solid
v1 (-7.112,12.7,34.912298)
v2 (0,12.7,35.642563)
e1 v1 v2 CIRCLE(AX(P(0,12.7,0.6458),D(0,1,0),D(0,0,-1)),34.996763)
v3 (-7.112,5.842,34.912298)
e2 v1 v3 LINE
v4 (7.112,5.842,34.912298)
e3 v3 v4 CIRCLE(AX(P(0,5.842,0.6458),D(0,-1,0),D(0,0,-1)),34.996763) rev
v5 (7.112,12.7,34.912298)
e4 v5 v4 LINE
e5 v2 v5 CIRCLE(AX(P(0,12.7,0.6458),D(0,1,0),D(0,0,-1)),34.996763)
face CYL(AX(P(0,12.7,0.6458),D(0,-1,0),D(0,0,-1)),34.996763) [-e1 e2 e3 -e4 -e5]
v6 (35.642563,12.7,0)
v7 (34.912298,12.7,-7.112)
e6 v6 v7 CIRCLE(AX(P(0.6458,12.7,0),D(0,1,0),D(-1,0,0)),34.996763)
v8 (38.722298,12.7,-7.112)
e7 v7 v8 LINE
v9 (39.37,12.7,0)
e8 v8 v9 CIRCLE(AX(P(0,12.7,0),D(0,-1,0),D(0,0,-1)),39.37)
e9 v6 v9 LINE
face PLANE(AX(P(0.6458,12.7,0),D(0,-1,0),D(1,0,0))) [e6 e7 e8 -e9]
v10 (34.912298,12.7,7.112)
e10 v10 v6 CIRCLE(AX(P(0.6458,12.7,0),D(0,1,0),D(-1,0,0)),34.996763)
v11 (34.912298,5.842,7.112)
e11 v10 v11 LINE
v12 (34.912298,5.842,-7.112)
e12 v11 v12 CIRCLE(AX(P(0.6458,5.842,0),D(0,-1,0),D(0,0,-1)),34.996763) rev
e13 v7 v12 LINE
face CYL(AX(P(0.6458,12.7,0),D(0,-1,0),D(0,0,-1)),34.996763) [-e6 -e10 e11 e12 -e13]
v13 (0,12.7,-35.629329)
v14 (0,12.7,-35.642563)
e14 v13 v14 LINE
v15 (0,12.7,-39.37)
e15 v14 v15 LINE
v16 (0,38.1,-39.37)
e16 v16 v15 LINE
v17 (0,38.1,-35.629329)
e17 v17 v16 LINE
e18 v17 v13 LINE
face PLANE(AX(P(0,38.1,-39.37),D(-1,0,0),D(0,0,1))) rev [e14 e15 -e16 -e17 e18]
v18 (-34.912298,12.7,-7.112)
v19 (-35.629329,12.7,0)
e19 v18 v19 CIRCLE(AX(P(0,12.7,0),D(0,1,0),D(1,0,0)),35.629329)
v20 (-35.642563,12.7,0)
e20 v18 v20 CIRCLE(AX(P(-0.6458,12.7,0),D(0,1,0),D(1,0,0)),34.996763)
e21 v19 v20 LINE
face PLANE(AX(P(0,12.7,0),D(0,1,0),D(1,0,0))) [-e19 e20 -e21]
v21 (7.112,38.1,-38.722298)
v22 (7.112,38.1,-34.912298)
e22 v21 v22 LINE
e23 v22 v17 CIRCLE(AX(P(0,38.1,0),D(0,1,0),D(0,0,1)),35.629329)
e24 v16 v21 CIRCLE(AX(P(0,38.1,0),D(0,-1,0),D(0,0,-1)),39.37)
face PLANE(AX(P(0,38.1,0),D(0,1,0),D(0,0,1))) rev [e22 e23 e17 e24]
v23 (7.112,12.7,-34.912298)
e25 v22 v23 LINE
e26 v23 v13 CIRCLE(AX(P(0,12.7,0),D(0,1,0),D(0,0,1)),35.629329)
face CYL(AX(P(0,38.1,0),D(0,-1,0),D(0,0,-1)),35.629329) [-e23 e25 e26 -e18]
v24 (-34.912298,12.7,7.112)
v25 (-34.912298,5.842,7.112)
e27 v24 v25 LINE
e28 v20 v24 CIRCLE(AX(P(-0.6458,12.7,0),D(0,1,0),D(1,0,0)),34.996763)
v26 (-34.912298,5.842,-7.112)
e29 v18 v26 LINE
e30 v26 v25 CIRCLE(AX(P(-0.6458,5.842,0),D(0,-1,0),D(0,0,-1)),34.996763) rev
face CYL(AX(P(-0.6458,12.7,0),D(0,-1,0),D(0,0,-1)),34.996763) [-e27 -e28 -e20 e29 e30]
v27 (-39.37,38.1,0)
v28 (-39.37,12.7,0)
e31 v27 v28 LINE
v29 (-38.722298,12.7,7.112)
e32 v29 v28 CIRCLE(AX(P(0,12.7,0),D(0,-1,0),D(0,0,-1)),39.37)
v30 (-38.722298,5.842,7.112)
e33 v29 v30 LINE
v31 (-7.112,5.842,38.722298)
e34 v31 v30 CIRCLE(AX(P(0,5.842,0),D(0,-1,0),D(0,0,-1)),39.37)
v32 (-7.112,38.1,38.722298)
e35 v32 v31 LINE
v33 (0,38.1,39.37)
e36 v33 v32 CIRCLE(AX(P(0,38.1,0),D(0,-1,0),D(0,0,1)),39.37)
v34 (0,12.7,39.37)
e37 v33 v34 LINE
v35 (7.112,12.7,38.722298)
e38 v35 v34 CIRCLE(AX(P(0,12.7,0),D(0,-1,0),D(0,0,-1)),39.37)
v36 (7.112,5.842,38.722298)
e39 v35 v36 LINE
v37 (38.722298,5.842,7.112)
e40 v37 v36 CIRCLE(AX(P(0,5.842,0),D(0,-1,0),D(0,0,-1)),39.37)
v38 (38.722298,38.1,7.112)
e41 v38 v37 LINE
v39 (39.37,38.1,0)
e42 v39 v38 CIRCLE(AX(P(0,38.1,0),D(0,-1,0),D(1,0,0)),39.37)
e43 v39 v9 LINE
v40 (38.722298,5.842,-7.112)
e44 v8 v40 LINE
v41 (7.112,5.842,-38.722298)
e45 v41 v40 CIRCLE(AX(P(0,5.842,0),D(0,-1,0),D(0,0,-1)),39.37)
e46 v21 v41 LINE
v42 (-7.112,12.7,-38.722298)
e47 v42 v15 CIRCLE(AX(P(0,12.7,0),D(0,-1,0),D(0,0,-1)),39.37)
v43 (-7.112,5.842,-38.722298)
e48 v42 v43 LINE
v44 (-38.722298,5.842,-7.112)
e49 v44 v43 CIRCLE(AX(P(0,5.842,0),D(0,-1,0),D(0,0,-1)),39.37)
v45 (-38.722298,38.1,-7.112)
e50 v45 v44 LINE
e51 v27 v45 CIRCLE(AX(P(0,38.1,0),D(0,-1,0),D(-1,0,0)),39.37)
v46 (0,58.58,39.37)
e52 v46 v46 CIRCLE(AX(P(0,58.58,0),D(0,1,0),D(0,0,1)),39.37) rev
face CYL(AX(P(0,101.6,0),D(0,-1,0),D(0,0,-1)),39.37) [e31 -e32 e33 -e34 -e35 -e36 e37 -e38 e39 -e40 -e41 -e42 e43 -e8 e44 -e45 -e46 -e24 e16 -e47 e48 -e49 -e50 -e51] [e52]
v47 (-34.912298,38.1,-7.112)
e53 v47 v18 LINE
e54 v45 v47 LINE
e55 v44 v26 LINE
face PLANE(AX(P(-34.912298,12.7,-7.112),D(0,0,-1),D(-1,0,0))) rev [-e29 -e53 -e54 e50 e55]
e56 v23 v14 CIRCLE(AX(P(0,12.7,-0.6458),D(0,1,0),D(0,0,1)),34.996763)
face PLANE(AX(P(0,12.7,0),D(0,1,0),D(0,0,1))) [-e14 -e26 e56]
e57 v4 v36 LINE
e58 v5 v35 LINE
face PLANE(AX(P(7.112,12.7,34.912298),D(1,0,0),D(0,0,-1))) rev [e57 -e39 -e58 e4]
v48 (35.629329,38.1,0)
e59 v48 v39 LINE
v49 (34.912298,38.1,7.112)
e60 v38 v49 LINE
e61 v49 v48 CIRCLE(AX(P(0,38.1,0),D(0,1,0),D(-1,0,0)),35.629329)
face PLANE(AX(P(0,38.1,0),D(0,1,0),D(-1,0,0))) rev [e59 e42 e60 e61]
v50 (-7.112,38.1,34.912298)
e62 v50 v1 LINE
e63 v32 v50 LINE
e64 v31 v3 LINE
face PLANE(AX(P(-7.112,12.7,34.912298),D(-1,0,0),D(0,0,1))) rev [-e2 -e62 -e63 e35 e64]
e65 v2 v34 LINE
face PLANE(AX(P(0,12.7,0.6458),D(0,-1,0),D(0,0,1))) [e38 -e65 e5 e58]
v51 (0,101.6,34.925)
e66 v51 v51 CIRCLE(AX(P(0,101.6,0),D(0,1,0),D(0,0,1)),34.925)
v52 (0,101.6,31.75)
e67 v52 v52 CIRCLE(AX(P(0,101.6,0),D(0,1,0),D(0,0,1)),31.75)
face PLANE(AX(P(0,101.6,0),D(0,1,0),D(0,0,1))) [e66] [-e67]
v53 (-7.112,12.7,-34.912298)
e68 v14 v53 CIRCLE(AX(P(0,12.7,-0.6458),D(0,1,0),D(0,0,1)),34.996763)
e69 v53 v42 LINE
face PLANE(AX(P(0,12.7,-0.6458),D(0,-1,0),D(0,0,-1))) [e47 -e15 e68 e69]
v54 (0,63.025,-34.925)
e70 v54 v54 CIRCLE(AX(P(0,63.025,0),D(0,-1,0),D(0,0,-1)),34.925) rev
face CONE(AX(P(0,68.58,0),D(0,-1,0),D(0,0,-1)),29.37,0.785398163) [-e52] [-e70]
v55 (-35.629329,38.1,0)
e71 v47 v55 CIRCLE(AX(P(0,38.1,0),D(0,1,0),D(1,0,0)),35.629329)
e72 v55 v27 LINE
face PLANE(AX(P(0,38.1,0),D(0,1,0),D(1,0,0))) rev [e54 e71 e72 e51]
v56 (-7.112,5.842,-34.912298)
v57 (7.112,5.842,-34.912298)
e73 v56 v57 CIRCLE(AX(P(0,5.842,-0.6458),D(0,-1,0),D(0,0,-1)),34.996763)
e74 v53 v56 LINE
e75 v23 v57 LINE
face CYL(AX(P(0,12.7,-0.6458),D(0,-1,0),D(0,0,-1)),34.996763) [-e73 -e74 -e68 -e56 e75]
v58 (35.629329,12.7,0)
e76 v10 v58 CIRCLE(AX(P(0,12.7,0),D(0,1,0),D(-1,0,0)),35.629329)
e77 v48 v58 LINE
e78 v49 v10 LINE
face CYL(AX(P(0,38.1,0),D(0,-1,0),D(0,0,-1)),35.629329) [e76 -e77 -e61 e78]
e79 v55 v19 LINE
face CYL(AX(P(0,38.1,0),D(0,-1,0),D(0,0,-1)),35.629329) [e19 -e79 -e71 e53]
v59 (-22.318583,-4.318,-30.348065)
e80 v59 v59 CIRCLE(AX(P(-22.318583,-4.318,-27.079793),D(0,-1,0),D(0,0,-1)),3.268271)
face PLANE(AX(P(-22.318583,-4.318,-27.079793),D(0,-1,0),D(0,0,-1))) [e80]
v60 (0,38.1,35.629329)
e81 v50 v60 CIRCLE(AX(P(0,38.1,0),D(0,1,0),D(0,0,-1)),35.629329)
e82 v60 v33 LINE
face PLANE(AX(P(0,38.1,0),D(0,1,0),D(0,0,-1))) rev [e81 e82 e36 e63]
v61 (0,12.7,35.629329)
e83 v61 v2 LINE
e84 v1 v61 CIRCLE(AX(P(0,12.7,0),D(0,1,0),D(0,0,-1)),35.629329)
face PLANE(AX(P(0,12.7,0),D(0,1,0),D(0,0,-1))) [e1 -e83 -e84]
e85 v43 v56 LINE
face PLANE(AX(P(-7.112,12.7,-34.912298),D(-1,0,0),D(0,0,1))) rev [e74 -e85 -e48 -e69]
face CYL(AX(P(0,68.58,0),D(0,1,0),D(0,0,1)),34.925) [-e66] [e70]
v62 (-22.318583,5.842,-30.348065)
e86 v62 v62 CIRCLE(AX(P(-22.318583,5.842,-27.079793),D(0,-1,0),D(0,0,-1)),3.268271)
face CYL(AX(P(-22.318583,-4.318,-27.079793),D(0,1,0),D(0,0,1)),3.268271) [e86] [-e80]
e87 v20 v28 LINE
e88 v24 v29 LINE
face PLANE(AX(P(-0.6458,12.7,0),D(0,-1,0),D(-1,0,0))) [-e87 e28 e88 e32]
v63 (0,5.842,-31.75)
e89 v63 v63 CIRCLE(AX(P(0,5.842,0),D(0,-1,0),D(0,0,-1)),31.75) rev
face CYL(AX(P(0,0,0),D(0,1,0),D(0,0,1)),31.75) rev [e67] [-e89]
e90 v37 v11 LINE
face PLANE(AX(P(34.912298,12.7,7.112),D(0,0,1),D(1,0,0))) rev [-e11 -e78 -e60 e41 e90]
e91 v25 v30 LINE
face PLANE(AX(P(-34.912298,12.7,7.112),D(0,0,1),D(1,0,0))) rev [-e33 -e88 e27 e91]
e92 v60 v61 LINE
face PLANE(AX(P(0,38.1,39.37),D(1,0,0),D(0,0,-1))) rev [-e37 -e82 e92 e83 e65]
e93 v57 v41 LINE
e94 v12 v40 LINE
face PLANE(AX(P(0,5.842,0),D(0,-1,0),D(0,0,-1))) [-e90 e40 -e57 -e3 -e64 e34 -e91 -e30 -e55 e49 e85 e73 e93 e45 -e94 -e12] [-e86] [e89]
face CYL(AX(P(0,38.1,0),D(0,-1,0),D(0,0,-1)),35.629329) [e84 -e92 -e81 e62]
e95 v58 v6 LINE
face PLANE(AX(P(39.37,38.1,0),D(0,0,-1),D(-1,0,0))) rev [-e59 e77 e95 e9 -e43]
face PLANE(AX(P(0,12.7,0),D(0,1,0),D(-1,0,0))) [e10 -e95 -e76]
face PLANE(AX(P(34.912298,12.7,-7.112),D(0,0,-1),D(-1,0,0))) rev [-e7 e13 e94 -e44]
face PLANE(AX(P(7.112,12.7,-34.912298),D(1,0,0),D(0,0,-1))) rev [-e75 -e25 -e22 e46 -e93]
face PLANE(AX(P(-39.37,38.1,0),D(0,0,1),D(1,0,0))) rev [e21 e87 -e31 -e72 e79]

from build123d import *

# Parameters (mm, degrees)
SKETCH1_R           = 39.37
BOSS_EXTRUDE1_DEPTH = 101.6
SKETCH2_R           = 31.75
CUT_EXTRUDE1_DEPTH  = 116.855745649
CUT_EXTRUDE2_START  = -33.02
SKETCH3_R           = 39.37
SKETCH3_R_2         = 34.925
CUT_EXTRUDE2_DEPTH  = 33.02
CUT_EXTRUDE3_DEPTH  = 12.7
SKETCH9_R           = 39.558823483
CUT_EXTRUDE5_DEPTH  = 111.768173967
SKETCH10_R          = 3.268271246
BOSS_EXTRUDE2_DEPTH = 10.16
CUT_EXTRUDE6_DEPTH  = 25.4
CIRPATTERN1_COUNT   = 4
CHAMFER1_SIZE       = 10


with BuildPart() as part:
    # Sketch1 → Boss-Extrude1 (new body)
    with BuildSketch(Plane(origin=(0, 0, 0), x_dir=(1, 0, 0), z_dir=(0, 1, 0))):
        with Locations(Location((0, 0, 0), (0, 0, 270))):
            Circle(SKETCH1_R)
    extrude(amount=BOSS_EXTRUDE1_DEPTH)

    # Sketch2 → Cut-Extrude1 (cut, through all)
    with BuildSketch(Plane(origin=(0, 101.6, 0), x_dir=(1, 0, 0), z_dir=(0, 1, 0))):
        with Locations(Location((0, 0, 0), (0, 0, 270))):
            Circle(SKETCH2_R)
    extrude(amount=-CUT_EXTRUDE1_DEPTH, mode=Mode.SUBTRACT)

    # Sketch3 → Cut-Extrude2 (cut)
    with BuildSketch(Plane(origin=(0, 101.6, 0), x_dir=(1, 0, 0), z_dir=(0, 1, 0)).offset(CUT_EXTRUDE2_START)):
        with Locations(Location((0, 0, 0), (0, 0, 270))):
            Circle(SKETCH3_R)
        with Locations(Location((0, 0, 0), (0, 0, 270))):
            Circle(SKETCH3_R_2, mode=Mode.SUBTRACT)
    extrude(amount=CUT_EXTRUDE2_DEPTH, mode=Mode.SUBTRACT)

    # Sketch5 → Cut-Extrude3 (cut)
    with BuildSketch(Plane.XZ):
        with BuildLine():
            Line((-7.112, -34.912297917), (-7.112, -38.722297917))
            ThreePointArc((-7.112, -38.722297917), (0, -39.380800166), (7.112, -38.722297917))
            Line((7.112, -38.722297917), (7.112, -34.912297917))
            ThreePointArc((7.112, -34.912297917), (0, -35.642563047), (-7.112, -34.912297917))
        make_face()
    cut_extrude3 = extrude(amount=-CUT_EXTRUDE3_DEPTH, mode=Mode.SUBTRACT)

    # Sketch9 → Cut-Extrude5 (cut, through all)
    with BuildSketch(Plane(origin=(0, 5.842, 0), x_dir=(-1, 0, 0), z_dir=(0, -1, 0))):
        Circle(SKETCH9_R)
    extrude(amount=CUT_EXTRUDE5_DEPTH, mode=Mode.SUBTRACT)

    # Sketch10 → Boss-Extrude2 (add)
    with BuildSketch(Plane.XZ.offset(-5.842)):
        with Locations(Location((-22.318582537, -27.07979346, 0), (0, 0, 270))):
            Circle(SKETCH10_R)
    extrude(amount=BOSS_EXTRUDE2_DEPTH)

    # Sketch23 → Cut-Extrude6 (cut)
    with BuildSketch(Plane.XZ.offset(-12.7)):
        with BuildLine():
            Line((0, -39.37), (0, -35.629329068))
            ThreePointArc((0, -35.629329068), (3.574027059, -35.449618058), (7.112, -34.912297917))
            Line((7.112, -34.912297917), (7.112, -38.722297917))
            ThreePointArc((7.112, -38.722297917), (3.570716384, -39.20774011), (0, -39.37))
        make_face()
    cut_extrude6 = extrude(amount=-CUT_EXTRUDE6_DEPTH, mode=Mode.SUBTRACT)

    # CirPattern1: Cut-Extrude3, Cut-Extrude6 ×4 about axis
    cirpattern1_axis = Axis((0, 0, 0), (0, 1, 0))
    add([cut_extrude3.rotate(cirpattern1_axis, i * 360 / CIRPATTERN1_COUNT) for i in range(1, CIRPATTERN1_COUNT)], mode=Mode.SUBTRACT)
    add([cut_extrude6.rotate(cirpattern1_axis, i * 360 / CIRPATTERN1_COUNT) for i in range(1, CIRPATTERN1_COUNT)], mode=Mode.SUBTRACT)

    # Chamfer1
    # the kernel refuses this chamfer: 10 mm, written as the material it takes off along each edge
    with BuildSketch(Plane(origin=(0, 68.58, 0), x_dir=(0, 0, 1), z_dir=(-1, 0, 0))) as chamfer1_piece_1_section:
        Polygon((39.37, -CHAMFER1_SIZE), (39.37 - CHAMFER1_SIZE, 0), (39.37, 0), align=None)
    chamfer1_piece_1 = revolve(axis=Axis((0, 68.58, 0), (0, 1, 0)), mode=Mode.PRIVATE)
    chamfer1_piece_1 = chamfer1_piece_1 - Plane(origin=(0, 60.807735234, 0), x_dir=(0, 0, 1), z_dir=(0, -1, 0)) * Cylinder(34.925, 158, mode=Mode.PRIVATE)
    add(chamfer1_piece_1, mode=Mode.SUBTRACT)


solid = part.part
